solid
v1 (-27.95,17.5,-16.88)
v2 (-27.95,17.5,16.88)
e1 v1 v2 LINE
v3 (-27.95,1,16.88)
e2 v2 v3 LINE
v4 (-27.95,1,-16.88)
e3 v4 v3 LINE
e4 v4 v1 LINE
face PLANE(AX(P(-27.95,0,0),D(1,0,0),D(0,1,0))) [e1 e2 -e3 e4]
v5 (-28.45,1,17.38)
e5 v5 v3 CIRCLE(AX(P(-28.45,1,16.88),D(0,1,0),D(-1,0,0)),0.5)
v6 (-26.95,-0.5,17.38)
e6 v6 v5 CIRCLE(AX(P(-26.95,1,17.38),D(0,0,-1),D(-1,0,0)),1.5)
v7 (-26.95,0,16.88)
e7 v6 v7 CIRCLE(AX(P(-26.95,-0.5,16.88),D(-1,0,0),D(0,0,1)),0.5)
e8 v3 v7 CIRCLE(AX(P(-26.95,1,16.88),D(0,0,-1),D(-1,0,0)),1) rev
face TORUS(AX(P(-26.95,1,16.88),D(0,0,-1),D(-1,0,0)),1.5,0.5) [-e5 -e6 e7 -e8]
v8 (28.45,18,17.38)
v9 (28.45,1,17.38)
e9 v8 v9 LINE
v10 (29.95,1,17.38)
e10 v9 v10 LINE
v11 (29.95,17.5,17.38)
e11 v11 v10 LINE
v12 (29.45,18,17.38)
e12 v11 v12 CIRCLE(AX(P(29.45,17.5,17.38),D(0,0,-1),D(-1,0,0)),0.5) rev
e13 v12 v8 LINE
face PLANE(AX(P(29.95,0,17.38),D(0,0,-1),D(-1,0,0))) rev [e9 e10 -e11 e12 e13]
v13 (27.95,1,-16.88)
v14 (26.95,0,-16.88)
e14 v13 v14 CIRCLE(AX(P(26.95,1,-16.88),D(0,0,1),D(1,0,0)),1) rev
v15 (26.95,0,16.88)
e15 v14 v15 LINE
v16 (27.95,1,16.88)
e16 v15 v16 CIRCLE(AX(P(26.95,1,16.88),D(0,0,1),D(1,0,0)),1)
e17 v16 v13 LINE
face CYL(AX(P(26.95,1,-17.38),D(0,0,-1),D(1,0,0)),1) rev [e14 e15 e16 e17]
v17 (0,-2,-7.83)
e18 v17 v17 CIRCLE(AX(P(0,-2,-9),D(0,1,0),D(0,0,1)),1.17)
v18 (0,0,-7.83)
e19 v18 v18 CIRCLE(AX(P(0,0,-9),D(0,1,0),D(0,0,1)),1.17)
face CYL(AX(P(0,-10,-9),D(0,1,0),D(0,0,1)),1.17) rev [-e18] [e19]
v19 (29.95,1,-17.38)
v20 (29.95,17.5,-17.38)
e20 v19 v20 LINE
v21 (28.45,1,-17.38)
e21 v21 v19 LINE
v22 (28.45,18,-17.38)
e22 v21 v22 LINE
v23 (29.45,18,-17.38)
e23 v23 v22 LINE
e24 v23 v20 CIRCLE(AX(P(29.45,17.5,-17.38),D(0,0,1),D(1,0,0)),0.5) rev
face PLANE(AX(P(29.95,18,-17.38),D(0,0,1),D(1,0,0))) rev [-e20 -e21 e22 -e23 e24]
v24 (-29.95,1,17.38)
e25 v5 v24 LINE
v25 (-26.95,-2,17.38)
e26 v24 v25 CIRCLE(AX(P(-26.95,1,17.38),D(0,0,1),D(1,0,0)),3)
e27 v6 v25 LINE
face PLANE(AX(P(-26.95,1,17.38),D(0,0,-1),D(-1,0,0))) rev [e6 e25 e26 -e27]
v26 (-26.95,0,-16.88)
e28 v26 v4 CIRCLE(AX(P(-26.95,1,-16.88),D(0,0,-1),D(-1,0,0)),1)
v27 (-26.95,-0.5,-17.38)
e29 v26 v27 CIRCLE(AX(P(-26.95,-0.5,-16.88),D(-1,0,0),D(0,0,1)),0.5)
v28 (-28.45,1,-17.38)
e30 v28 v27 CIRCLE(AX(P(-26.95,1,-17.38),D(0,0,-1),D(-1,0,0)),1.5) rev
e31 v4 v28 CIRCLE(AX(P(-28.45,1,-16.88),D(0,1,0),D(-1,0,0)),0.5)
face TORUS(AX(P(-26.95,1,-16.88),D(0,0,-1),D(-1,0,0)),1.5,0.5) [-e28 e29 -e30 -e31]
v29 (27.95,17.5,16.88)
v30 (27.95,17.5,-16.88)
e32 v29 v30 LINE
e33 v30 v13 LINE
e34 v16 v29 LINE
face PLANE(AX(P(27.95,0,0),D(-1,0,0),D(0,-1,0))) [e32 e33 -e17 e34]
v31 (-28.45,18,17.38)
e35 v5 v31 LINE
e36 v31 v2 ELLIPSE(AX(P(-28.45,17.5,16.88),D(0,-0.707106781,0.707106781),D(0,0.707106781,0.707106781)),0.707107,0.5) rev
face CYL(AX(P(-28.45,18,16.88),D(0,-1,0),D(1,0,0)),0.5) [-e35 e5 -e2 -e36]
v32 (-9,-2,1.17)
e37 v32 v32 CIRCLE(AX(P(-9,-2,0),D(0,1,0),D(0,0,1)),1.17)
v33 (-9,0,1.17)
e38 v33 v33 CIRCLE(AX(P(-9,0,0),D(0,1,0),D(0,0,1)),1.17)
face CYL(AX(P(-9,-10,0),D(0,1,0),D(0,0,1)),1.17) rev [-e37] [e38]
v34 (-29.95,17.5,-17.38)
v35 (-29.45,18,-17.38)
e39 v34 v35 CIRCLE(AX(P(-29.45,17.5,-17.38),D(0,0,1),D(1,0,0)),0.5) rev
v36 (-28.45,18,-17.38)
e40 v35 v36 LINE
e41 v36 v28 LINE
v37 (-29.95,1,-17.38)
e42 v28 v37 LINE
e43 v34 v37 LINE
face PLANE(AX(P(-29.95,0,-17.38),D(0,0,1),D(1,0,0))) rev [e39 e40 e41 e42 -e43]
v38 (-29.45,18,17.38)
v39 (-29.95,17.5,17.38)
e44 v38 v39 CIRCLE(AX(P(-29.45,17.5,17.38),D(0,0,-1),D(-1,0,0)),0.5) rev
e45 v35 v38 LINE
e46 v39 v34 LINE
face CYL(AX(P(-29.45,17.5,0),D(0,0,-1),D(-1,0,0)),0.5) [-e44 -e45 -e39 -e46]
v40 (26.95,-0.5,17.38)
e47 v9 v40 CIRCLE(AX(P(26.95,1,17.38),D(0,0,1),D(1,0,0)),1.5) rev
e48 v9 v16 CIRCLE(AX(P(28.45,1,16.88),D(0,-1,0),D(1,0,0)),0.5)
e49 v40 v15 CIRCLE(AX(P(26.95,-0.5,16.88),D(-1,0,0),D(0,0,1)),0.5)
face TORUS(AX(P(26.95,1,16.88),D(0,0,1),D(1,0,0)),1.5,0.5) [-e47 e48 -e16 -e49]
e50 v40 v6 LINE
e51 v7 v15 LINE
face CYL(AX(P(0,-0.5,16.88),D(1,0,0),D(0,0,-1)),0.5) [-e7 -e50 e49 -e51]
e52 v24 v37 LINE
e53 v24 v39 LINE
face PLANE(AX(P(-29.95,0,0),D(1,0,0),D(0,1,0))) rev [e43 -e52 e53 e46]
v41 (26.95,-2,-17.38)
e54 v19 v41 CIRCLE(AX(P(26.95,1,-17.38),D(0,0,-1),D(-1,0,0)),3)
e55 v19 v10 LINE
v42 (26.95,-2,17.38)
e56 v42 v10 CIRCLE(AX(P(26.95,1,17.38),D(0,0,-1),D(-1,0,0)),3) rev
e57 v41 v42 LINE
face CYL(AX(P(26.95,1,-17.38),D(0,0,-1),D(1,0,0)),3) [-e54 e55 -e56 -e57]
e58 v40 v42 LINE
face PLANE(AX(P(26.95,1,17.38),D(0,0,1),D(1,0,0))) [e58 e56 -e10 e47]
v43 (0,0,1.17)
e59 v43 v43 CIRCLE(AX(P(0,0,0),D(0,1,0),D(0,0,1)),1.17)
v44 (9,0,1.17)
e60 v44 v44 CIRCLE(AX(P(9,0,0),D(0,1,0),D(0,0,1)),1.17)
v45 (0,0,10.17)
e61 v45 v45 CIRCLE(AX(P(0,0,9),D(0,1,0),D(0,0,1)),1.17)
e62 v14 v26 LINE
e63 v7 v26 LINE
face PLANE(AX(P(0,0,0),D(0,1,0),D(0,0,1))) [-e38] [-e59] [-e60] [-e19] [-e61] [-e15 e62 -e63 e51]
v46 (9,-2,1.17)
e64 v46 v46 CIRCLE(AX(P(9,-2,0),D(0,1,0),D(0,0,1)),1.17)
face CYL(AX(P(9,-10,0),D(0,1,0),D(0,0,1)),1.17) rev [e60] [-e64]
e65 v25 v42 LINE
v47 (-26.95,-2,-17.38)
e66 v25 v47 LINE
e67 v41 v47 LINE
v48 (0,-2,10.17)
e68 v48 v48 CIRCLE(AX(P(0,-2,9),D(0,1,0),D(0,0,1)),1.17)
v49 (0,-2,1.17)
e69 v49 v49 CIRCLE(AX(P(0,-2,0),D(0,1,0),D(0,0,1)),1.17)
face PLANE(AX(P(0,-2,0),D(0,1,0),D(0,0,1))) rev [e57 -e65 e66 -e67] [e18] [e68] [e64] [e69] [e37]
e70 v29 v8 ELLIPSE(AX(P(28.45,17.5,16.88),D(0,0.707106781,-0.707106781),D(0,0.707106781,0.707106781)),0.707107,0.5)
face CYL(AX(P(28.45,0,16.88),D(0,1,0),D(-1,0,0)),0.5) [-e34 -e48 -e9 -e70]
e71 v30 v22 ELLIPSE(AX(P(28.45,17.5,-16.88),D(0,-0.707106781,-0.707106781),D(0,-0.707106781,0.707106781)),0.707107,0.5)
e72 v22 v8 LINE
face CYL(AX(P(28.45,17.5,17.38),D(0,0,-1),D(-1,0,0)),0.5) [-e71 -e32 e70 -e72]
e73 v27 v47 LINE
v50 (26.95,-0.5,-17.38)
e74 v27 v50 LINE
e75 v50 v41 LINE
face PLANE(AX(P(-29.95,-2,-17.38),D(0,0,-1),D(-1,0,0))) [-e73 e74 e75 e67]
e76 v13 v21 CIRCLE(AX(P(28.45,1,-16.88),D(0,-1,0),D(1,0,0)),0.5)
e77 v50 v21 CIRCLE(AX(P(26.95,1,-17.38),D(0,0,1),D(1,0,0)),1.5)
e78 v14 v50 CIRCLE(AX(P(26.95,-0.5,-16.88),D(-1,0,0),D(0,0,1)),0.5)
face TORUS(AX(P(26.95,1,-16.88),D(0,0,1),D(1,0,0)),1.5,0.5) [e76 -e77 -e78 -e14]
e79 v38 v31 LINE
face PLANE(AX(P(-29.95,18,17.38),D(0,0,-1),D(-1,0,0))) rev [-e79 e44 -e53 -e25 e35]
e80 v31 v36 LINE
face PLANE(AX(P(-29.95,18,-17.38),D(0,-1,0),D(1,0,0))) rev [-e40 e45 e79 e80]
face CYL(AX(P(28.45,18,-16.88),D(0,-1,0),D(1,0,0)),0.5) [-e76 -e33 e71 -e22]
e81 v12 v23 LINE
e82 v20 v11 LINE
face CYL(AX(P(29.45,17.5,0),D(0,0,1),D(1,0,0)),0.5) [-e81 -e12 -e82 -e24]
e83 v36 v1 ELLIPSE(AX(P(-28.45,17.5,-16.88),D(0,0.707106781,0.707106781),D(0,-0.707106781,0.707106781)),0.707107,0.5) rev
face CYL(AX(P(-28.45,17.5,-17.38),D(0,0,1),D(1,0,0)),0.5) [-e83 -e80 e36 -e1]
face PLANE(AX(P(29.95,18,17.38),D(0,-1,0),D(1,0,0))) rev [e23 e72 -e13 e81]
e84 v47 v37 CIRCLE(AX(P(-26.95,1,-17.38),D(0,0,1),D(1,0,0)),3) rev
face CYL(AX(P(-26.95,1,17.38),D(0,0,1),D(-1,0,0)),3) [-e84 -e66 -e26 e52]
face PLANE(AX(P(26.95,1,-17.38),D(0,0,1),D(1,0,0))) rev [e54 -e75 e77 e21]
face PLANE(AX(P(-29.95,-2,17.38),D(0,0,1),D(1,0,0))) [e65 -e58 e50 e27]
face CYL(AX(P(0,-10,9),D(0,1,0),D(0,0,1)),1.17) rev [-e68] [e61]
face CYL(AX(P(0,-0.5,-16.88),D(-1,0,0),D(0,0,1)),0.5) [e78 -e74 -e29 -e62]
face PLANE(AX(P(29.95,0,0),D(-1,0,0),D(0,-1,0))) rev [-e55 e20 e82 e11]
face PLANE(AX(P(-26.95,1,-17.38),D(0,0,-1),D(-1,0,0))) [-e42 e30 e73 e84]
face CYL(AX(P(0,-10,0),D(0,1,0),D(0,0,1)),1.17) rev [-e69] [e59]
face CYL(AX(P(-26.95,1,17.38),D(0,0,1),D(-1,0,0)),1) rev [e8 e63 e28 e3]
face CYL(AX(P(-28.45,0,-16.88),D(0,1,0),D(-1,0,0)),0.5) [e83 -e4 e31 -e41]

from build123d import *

# Parameters (mm, degrees)
SKETCH1_W                      = 59.9
SKETCH1_H                      = 34.76
BASE_FLANGE1_DEPTH             = 2
EDGE_FLANGE1_STRIP_W           = 10
EDGE_FLANGE1_STRIP_H           = 2
EDGE_FLANGE1_STRIP_CUT_DEPTH   = 34.76
EDGE_FLANGE1_STRIP_2_W         = 10
EDGE_FLANGE1_STRIP_2_H         = 2
EDGE_FLANGE1_STRIP_CUT_2_DEPTH = 34.76
EDGE_FLANGE1_DEPTH             = 34.76
EDGE_FLANGE1_BEND_DEPTH        = 34.76
FILLET1_R                      = 0.5
SKETCH8_R                      = 1.17
CUT_EXTRUDE1_DEPTH             = 10


# Sheet-metal steps are written as plain solids
with BuildPart() as part:
    # Sketch1 → Base-Flange1 (new body)
    with BuildSketch(Plane(origin=(0, 0, 0), x_dir=(1, 0, 0), z_dir=(0, 1, 0))):
        Rectangle(SKETCH1_W, SKETCH1_H)
    extrude(amount=-BASE_FLANGE1_DEPTH)

    # Edge-Flange1 strip (across the edge) → Edge-Flange1 strip cut (cut)
    with BuildSketch(Plane(origin=(-29.95, 0, -17.38), x_dir=(1, 0, 0), z_dir=(0, 0, 1))):
        with Locations((-2, -1)):
            Rectangle(EDGE_FLANGE1_STRIP_W, EDGE_FLANGE1_STRIP_H)
    extrude(amount=EDGE_FLANGE1_STRIP_CUT_DEPTH, mode=Mode.SUBTRACT)

    # Edge-Flange1 strip 2 (across the edge) → Edge-Flange1 strip cut 2 (cut)
    with BuildSketch(Plane(origin=(29.95, 0, 17.38), x_dir=(-1, 0, 0), z_dir=(0, 0, -1))):
        with Locations((-2, -1)):
            Rectangle(EDGE_FLANGE1_STRIP_2_W, EDGE_FLANGE1_STRIP_2_H)
    extrude(amount=EDGE_FLANGE1_STRIP_CUT_2_DEPTH, mode=Mode.SUBTRACT)

    # Edge-Flange1 section (across the edge) → Edge-Flange1 (add)
    with BuildSketch(Plane(origin=(-29.95, 0, -17.38), x_dir=(1, 0, 0), z_dir=(0, 0, 1))):
        with BuildLine():
            Line((0, 1), (0, 18))
            Line((0, 18), (2, 18))
            Line((2, 18), (2, 1))
            ThreePointArc((2, 1), (2.292893219, 0.292893219), (3, 0))
            Line((3, 0), (3, -2))
            ThreePointArc((3, -2), (0.878679656, -1.121320344), (0, 1))
        make_face()
    extrude(amount=EDGE_FLANGE1_DEPTH)

    # Edge-Flange1 section 2 (across the edge) → Edge-Flange1 bend (add)
    with BuildSketch(Plane(origin=(29.95, 0, 17.38), x_dir=(-1, 0, 0), z_dir=(0, 0, -1))):
        with BuildLine():
            Line((0, 1), (0, 18))
            Line((0, 18), (2, 18))
            Line((2, 18), (2, 1))
            ThreePointArc((2, 1), (2.292893219, 0.292893219), (3, 0))
            Line((3, 0), (3, -2))
            ThreePointArc((3, -2), (0.878679656, -1.121320344), (0, 1))
        make_face()
    extrude(amount=EDGE_FLANGE1_BEND_DEPTH)

    # Fillet1
    fillet1_edges = [part.edges().sort_by_distance(p)[0] for p in [
        (0, 0, 17.38),
        (0, 0, -17.38),
        (-27.657106781, 0.292893219, -17.38),
        (-27.657106781, 0.292893219, 17.38),
        (-27.95, 9.5, 17.38),
        (-27.95, 9.5, -17.38),
        (-29.95, 18, 0),
        (-27.95, 18, 0),
        (27.657106781, 0.292893219, 17.38),
        (27.657106781, 0.292893219, -17.38),
        (27.95, 9.5, 17.38),
        (27.95, 9.5, -17.38),
        (29.95, 18, 0),
        (27.95, 18, 0),
    ]]
    fillet(fillet1_edges, radius=FILLET1_R)

    # Sketch8 → Cut-Extrude1 (cut)
    with BuildSketch(Plane(origin=(0, 0, 0), x_dir=(1, 0, 0), z_dir=(0, 1, 0))):
        with Locations(Location((0, 0, 0), (0, 0, 270))):
            Circle(SKETCH8_R)
        with Locations(Location((0, 9, 0), (0, 0, 270))):
            Circle(SKETCH8_R)
        with Locations(Location((9, 0, 0), (0, 0, 270))):
            Circle(SKETCH8_R)
        with Locations(Location((0, -9, 0), (0, 0, 270))):
            Circle(SKETCH8_R)
        with Locations(Location((-9, 0, 0), (0, 0, 270))):
            Circle(SKETCH8_R)
    extrude(amount=-CUT_EXTRUDE1_DEPTH, mode=Mode.SUBTRACT)


solid = part.part
